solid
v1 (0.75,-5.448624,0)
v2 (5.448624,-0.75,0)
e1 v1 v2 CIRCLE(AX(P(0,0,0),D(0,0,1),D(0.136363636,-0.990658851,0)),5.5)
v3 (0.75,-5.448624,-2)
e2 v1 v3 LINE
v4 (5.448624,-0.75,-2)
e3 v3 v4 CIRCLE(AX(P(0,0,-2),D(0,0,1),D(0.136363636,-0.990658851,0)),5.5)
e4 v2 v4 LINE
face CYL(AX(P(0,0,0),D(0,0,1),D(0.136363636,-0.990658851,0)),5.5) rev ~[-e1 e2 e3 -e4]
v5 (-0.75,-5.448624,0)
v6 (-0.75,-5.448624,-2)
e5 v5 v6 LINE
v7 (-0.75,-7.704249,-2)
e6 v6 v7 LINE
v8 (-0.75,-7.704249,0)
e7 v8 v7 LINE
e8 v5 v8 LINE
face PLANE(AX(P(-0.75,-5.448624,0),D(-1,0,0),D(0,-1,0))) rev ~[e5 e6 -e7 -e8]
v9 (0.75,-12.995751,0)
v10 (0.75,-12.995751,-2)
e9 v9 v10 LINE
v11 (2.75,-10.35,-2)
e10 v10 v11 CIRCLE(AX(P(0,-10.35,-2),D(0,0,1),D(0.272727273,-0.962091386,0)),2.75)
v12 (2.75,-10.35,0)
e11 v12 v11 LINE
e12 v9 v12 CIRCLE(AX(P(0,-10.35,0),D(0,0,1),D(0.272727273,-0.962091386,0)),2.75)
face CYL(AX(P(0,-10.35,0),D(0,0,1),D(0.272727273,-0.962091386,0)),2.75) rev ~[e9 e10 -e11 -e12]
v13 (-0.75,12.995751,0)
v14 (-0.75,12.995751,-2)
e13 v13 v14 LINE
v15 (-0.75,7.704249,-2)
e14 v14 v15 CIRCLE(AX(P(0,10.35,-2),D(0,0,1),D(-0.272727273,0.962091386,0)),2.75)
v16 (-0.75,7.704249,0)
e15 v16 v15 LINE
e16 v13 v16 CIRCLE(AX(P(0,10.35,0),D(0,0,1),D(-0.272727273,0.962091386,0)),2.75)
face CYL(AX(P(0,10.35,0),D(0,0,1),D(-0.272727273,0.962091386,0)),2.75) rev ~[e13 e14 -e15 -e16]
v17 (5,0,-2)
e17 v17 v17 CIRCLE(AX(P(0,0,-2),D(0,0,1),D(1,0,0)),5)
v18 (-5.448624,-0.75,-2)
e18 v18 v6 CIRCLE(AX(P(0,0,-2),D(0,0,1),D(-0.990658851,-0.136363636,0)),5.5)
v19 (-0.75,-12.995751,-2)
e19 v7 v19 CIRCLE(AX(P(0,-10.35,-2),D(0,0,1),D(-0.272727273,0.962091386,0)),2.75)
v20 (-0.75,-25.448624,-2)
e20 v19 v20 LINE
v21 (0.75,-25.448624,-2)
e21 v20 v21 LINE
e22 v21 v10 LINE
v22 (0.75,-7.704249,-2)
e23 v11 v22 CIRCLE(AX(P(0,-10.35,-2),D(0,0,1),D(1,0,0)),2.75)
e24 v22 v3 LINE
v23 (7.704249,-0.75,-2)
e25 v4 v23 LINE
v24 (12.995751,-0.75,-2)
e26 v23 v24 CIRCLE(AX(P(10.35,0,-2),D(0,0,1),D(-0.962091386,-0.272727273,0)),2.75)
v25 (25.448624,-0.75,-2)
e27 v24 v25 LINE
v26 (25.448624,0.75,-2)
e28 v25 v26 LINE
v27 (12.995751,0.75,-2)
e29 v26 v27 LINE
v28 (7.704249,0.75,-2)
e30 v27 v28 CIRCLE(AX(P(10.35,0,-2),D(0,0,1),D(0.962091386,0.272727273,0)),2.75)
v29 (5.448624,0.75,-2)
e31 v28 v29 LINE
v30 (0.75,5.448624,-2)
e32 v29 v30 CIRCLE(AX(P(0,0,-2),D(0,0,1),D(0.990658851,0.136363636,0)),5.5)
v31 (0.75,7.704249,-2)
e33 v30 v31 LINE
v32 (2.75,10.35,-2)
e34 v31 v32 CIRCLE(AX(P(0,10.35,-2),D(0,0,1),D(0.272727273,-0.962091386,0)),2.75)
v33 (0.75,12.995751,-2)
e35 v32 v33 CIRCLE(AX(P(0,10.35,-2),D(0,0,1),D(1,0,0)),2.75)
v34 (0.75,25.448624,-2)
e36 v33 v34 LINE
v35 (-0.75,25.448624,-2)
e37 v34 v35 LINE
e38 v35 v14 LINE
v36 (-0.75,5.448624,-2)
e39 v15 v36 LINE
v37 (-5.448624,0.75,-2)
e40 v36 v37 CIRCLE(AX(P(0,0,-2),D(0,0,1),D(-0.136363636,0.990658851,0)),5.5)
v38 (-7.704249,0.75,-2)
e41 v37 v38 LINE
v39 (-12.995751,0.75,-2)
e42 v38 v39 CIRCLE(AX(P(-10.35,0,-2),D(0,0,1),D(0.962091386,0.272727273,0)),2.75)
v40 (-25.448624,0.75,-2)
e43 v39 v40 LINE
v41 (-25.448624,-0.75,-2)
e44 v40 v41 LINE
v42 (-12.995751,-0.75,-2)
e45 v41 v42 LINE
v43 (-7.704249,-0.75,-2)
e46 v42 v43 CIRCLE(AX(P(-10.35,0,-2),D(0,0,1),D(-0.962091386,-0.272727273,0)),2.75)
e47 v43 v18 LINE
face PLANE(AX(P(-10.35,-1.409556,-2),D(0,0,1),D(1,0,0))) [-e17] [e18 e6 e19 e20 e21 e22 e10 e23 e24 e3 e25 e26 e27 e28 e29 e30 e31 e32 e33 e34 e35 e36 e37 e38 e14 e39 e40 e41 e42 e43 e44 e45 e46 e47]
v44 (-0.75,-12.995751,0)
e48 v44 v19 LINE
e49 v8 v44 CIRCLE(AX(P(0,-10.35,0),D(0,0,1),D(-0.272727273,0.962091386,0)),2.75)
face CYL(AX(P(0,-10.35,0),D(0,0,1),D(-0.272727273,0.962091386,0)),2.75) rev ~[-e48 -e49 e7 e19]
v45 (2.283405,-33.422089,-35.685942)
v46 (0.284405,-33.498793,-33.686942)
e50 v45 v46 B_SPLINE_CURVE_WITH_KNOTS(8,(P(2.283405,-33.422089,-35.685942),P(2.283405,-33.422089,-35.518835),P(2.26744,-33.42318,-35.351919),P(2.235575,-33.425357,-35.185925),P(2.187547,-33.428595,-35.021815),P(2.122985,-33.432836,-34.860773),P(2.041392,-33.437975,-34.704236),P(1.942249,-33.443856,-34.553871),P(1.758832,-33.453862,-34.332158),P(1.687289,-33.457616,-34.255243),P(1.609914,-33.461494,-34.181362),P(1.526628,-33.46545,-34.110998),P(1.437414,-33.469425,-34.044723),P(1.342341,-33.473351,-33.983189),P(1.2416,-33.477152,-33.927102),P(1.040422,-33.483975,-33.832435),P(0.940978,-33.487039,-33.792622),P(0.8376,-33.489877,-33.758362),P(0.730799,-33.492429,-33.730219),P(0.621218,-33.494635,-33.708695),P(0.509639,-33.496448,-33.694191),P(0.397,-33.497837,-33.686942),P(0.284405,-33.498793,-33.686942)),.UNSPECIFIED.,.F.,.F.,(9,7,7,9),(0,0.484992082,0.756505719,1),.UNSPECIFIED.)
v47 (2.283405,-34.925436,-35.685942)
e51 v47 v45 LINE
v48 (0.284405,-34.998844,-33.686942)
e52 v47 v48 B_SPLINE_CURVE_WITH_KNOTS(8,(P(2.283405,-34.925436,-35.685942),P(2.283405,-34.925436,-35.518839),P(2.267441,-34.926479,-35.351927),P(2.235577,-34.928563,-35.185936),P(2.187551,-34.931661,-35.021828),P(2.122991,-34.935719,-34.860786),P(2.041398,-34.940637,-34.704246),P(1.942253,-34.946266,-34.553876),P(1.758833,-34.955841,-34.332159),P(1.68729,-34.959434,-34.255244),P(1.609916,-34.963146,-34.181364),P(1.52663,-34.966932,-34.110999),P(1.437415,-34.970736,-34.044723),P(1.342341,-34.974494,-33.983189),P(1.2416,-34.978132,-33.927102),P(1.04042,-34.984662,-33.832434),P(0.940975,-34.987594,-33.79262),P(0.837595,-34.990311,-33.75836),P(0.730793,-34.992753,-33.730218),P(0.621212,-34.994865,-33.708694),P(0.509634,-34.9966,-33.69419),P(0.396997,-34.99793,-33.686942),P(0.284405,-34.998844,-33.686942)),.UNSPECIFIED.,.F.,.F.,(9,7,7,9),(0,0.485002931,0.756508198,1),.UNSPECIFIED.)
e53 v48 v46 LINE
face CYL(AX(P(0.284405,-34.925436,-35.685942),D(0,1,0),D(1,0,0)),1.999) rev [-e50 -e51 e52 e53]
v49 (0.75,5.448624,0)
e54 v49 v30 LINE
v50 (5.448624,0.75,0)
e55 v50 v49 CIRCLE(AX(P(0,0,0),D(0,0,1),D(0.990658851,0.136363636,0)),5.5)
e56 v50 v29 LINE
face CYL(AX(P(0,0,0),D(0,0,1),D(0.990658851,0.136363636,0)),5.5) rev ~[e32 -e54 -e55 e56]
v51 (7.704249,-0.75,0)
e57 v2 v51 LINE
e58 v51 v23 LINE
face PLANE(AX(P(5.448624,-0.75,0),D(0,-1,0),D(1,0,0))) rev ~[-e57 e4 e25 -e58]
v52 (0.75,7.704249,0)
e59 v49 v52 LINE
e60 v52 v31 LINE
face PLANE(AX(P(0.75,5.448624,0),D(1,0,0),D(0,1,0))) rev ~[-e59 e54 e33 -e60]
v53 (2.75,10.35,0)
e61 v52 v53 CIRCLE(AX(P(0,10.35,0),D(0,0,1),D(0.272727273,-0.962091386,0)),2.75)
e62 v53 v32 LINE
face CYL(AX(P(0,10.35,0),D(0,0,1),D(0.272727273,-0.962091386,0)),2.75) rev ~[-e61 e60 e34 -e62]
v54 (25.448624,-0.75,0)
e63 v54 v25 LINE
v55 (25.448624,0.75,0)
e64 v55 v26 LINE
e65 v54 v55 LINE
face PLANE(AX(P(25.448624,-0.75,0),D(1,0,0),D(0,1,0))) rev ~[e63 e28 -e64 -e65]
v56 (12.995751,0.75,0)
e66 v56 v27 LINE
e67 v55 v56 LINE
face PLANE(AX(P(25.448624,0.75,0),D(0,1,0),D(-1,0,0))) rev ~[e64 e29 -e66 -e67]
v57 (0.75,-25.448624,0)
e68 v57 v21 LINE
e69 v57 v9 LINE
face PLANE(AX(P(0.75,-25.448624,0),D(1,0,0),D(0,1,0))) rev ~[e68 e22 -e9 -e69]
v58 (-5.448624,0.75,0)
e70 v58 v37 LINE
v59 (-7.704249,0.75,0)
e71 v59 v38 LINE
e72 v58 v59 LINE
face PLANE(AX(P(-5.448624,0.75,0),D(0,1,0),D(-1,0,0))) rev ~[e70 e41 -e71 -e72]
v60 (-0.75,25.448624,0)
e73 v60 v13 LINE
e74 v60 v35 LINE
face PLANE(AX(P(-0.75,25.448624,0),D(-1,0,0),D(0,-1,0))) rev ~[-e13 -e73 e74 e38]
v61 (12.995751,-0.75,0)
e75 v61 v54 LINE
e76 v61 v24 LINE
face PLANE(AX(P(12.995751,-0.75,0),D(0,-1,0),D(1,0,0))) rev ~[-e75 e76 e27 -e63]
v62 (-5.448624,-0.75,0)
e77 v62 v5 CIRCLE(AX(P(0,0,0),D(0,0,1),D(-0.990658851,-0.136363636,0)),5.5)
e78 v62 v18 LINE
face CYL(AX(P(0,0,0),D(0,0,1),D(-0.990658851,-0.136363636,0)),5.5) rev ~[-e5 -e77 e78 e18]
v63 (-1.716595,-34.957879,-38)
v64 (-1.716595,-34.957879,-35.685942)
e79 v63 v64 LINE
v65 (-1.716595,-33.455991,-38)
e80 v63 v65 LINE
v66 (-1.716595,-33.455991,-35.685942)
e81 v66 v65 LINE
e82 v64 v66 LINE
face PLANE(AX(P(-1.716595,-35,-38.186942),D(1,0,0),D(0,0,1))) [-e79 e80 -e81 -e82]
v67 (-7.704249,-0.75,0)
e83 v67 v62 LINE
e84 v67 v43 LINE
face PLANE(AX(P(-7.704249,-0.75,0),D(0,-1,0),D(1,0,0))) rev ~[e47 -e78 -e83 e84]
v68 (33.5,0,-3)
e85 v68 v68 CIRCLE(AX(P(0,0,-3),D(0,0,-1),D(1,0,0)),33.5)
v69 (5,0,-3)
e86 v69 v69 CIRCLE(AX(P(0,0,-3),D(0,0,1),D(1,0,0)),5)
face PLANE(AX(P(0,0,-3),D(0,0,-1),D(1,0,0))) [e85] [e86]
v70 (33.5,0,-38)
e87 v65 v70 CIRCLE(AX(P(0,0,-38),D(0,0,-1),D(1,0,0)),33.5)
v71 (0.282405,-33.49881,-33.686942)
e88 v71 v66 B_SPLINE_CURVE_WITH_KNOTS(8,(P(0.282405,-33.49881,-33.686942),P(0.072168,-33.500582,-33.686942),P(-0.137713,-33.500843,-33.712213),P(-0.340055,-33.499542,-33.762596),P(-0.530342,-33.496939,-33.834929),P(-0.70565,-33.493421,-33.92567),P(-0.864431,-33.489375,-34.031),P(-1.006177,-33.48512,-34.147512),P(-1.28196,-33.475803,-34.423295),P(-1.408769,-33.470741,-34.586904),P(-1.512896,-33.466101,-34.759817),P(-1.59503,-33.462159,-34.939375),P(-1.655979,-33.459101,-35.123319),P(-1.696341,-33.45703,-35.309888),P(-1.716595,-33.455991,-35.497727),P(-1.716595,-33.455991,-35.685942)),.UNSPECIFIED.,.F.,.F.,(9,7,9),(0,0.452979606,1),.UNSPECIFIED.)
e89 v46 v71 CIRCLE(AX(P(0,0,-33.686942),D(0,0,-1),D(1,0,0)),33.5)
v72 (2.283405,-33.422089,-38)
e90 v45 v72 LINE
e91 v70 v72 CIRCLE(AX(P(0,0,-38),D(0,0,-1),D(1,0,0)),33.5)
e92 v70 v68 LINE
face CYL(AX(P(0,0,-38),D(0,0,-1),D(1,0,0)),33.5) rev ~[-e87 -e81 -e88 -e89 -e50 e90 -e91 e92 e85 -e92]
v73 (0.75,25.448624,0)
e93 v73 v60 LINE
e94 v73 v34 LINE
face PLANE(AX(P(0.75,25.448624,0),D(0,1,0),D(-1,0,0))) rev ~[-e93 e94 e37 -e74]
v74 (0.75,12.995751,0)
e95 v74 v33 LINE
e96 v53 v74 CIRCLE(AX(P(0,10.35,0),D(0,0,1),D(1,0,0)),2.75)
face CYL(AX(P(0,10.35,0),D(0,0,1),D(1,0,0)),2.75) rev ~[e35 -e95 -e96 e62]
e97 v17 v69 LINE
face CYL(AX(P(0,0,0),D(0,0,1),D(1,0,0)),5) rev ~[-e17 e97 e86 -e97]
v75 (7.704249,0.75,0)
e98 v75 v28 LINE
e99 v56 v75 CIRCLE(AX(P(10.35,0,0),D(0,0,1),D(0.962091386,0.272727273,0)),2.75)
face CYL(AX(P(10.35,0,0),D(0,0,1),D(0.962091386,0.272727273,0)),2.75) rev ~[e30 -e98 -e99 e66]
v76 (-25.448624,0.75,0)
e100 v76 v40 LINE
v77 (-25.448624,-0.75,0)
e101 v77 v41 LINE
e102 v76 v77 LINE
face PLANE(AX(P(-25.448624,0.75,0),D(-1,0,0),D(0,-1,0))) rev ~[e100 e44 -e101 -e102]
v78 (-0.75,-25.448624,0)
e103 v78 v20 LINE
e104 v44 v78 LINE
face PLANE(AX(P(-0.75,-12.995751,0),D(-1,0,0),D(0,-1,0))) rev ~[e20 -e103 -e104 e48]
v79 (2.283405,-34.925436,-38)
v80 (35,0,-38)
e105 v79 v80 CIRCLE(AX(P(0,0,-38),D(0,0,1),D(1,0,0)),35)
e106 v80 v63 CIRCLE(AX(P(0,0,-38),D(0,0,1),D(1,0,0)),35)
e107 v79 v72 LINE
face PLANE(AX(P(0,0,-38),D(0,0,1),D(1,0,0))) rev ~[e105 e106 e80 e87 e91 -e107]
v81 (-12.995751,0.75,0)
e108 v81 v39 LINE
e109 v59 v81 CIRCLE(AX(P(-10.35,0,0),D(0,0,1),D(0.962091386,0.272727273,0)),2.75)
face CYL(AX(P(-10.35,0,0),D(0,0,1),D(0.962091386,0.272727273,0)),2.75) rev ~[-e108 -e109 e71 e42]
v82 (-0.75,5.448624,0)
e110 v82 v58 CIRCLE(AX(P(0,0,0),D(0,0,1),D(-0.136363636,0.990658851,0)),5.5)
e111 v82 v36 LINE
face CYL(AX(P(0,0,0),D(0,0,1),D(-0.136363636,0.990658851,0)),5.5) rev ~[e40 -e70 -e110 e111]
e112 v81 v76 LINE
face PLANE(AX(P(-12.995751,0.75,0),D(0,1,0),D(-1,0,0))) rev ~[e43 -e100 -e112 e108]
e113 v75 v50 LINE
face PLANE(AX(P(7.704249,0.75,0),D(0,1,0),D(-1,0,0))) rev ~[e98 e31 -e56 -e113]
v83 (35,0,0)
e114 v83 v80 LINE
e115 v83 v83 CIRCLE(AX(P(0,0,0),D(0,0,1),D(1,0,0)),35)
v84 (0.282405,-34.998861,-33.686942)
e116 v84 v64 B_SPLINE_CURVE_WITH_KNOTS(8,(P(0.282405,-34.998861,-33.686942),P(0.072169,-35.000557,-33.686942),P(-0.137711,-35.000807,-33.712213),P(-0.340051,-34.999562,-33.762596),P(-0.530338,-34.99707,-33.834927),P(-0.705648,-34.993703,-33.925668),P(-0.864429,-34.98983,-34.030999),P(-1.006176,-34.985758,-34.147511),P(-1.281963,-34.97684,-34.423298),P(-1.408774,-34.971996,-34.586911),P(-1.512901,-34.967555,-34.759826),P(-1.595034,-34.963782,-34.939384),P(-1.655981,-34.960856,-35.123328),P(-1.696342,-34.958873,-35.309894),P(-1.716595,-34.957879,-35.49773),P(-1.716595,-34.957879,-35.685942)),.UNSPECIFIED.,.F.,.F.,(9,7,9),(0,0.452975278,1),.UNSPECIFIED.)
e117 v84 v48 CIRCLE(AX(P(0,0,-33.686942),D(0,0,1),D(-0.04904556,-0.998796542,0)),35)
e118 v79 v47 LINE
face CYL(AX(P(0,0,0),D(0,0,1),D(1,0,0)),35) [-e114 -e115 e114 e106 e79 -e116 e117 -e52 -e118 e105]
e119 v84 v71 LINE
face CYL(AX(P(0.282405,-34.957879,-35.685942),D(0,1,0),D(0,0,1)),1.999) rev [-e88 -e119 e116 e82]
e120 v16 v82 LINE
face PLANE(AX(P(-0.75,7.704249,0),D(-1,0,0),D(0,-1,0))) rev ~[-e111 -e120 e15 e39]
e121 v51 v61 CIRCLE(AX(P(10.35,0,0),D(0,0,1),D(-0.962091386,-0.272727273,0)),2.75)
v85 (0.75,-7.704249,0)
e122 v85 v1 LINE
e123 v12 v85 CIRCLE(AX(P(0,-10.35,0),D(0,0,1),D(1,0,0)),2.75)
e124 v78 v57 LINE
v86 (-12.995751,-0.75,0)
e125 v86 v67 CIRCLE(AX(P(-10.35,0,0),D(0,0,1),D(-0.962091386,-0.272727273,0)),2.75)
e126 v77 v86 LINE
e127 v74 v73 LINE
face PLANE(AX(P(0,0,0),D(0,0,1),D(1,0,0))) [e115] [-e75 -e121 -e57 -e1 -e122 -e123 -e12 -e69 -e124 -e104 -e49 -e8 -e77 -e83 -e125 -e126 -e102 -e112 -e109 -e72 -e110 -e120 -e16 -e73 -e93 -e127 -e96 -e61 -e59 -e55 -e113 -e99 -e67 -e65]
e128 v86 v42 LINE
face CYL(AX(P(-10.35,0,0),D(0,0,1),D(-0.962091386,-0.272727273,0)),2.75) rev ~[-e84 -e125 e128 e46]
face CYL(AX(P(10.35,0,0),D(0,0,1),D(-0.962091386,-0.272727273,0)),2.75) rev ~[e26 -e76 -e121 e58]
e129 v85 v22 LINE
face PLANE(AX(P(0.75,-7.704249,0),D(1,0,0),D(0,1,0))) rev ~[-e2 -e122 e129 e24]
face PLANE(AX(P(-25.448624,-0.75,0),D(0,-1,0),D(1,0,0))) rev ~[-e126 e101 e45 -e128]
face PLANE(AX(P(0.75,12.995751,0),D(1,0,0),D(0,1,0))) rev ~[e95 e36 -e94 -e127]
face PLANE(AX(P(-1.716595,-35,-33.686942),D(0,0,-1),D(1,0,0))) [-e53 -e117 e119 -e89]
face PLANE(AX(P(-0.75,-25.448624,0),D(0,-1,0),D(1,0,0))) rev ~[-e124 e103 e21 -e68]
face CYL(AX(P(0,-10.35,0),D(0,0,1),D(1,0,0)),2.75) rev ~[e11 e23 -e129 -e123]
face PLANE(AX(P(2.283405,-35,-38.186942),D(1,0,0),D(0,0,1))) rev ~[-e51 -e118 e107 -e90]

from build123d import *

# Parameters (mm, degrees)
F0_R     = 35
F0_R_2   = 5
F1_DEPTH = 38
F2_DEPTH = 2
F3_R     = 33.5
F4_DEPTH = 35
F5_DEPTH = 38.001
F7_W     = 4
F7_H     = 4.5
F8_DEPTH = 2
F9_R     = 1.999


# Not quite as in the source:
# - a fillet or chamfer is up to 0.001 mm smaller than in the source, because OpenCascade refuses the exact size


with BuildPart() as f1:
    # F0 (on Top) → F1 (new body)
    with BuildSketch(Plane.XY):
        Circle(F0_R)
        with BuildLine():
            ThreePointArc((0.75, 5.4486236794), (3.8890872965, 3.8890872965), (5.4486236794, 0.75))
            Line((5.4486236794, 0.75), (7.7042486889, 0.75))
            ThreePointArc((7.7042486889, 0.75), (10.35, 2.75), (12.9957513111, 0.75))
            Line((12.9957513111, 0.75), (25.4486236794, 0.75))
            Line((25.4486236794, 0.75), (25.4486236794, -0.75))
            Line((25.4486236794, -0.75), (12.9957513111, -0.75))
            ThreePointArc((12.9957513111, -0.75), (10.35, -2.75), (7.7042486889, -0.75))
            Line((7.7042486889, -0.75), (5.4486236794, -0.75))
            ThreePointArc((5.4486236794, -0.75), (3.8890872965, -3.8890872965), (0.75, -5.4486236794))
            Line((0.75, -5.4486236794), (0.75, -7.7042486889))
            ThreePointArc((0.75, -7.7042486889), (2.1937410968, -8.6916876048), (2.75, -10.35))
            ThreePointArc((2.75, -10.35), (2.1937410968, -12.0083123952), (0.75, -12.9957513111))
            Line((0.75, -12.9957513111), (0.75, -25.4486236794))
            Line((0.75, -25.4486236794), (-0.75, -25.4486236794))
            Line((-0.75, -25.4486236794), (-0.75, -12.9957513111))
            ThreePointArc((-0.75, -12.9957513111), (-2.75, -10.35), (-0.75, -7.7042486889))
            Line((-0.75, -7.7042486889), (-0.75, -5.4486236794))
            ThreePointArc((-0.75, -5.4486236794), (-3.8890872965, -3.8890872965), (-5.4486236794, -0.75))
            Line((-5.4486236794, -0.75), (-7.7042486889, -0.75))
            ThreePointArc((-7.7042486889, -0.75), (-10.35, -2.75), (-12.9957513111, -0.75))
            Line((-12.9957513111, -0.75), (-25.4486236794, -0.75))
            Line((-25.4486236794, -0.75), (-25.4486236794, 0.75))
            Line((-25.4486236794, 0.75), (-12.9957513111, 0.75))
            ThreePointArc((-12.9957513111, 0.75), (-10.35, 2.75), (-7.7042486889, 0.75))
            Line((-7.7042486889, 0.75), (-5.4486236794, 0.75))
            ThreePointArc((-5.4486236794, 0.75), (-3.8890872965, 3.8890872965), (-0.75, 5.4486236794))
            Line((-0.75, 5.4486236794), (-0.75, 7.7042486889))
            ThreePointArc((-0.75, 7.7042486889), (-2.75, 10.35), (-0.75, 12.9957513111))
            Line((-0.75, 12.9957513111), (-0.75, 25.4486236794))
            Line((-0.75, 25.4486236794), (0.75, 25.4486236794))
            Line((0.75, 25.4486236794), (0.75, 12.9957513111))
            ThreePointArc((0.75, 12.9957513111), (2.1937410968, 12.0083123952), (2.75, 10.35))
            ThreePointArc((2.75, 10.35), (2.1937410968, 8.6916876048), (0.75, 7.7042486889))
            Line((0.75, 7.7042486889), (0.75, 5.4486236794))
        make_face(mode=Mode.SUBTRACT)
        with BuildLine():
            Line((0.75, -12.9957513111), (0.75, -7.7042486889))
            ThreePointArc((0.75, -7.7042486889), (0, -7.6), (-0.75, -7.7042486889))
            Line((-0.75, -7.7042486889), (-0.75, -12.9957513111))
            ThreePointArc((-0.75, -12.9957513111), (0, -13.1), (0.75, -12.9957513111))
        make_face()
        with BuildLine():
            Line((12.9957513111, 0.75), (7.7042486889, 0.75))
            ThreePointArc((7.7042486889, 0.75), (7.6, 0), (7.7042486889, -0.75))
            Line((7.7042486889, -0.75), (12.9957513111, -0.75))
            ThreePointArc((12.9957513111, -0.75), (13.0738131457, -0.3786052658), (13.1, 0))
            ThreePointArc((13.1, 0), (13.0738131457, 0.3786052658), (12.9957513111, 0.75))
        make_face()
        with BuildLine():
            ThreePointArc((-5.4486236794, -0.75), (-5.5, 0), (-5.4486236794, 0.75))
            Line((-5.4486236794, 0.75), (-7.7042486889, 0.75))
            ThreePointArc((-7.7042486889, 0.75), (-7.6261868543, 0.3786052658), (-7.6, 0))
            ThreePointArc((-7.6, 0), (-7.6261868543, -0.3786052658), (-7.7042486889, -0.75))
            Line((-7.7042486889, -0.75), (-5.4486236794, -0.75))
        make_face()
        with BuildLine():
            Line((-12.9957513111, 0.75), (-7.7042486889, 0.75))
            ThreePointArc((-7.7042486889, 0.75), (-10.35, 2.75), (-12.9957513111, 0.75))
        make_face()
        with BuildLine():
            ThreePointArc((-0.75, 12.9957513111), (0, 13.1), (0.75, 12.9957513111))
            Line((0.75, 12.9957513111), (0.75, 25.4486236794))
            Line((0.75, 25.4486236794), (-0.75, 25.4486236794))
            Line((-0.75, 25.4486236794), (-0.75, 12.9957513111))
        make_face()
        with BuildLine():
            ThreePointArc((-12.9957513111, -0.75), (-10.35, -2.75), (-7.7042486889, -0.75))
            Line((-7.7042486889, -0.75), (-12.9957513111, -0.75))
        make_face()
        with BuildLine():
            ThreePointArc((-12.9957513111, -0.75), (-13.1, 0), (-12.9957513111, 0.75))
            Line((-12.9957513111, 0.75), (-25.4486236794, 0.75))
            Line((-25.4486236794, 0.75), (-25.4486236794, -0.75))
            Line((-25.4486236794, -0.75), (-12.9957513111, -0.75))
        make_face()
        with BuildLine():
            Line((-0.75, -12.9957513111), (-0.75, -7.7042486889))
            ThreePointArc((-0.75, -7.7042486889), (-2.75, -10.35), (-0.75, -12.9957513111))
        make_face()
        with BuildLine():
            Line((0.75, -25.4486236794), (0.75, -12.9957513111))
            ThreePointArc((0.75, -12.9957513111), (0, -13.1), (-0.75, -12.9957513111))
            Line((-0.75, -12.9957513111), (-0.75, -25.4486236794))
            Line((-0.75, -25.4486236794), (0.75, -25.4486236794))
        make_face()
        with BuildLine():
            ThreePointArc((2.75, -10.35), (2.1937410968, -8.6916876048), (0.75, -7.7042486889))
            Line((0.75, -7.7042486889), (0.75, -12.9957513111))
            ThreePointArc((0.75, -12.9957513111), (2.1937410968, -12.0083123952), (2.75, -10.35))
        make_face()
        with BuildLine():
            Line((12.9957513111, -0.75), (7.7042486889, -0.75))
            ThreePointArc((7.7042486889, -0.75), (10.35, -2.75), (12.9957513111, -0.75))
        make_face()
        with BuildLine():
            Line((25.4486236794, 0.75), (12.9957513111, 0.75))
            ThreePointArc((12.9957513111, 0.75), (13.0738131457, 0.3786052658), (13.1, 0))
            ThreePointArc((13.1, 0), (13.0738131457, -0.3786052658), (12.9957513111, -0.75))
            Line((12.9957513111, -0.75), (25.4486236794, -0.75))
            Line((25.4486236794, -0.75), (25.4486236794, 0.75))
        make_face()
        with BuildLine():
            ThreePointArc((5.4486236794, -0.75), (5.4871408874, -0.3758788124), (5.5, 0))
            ThreePointArc((5.5, 0), (5.4871408874, 0.3758788124), (5.4486236794, 0.75))
            ThreePointArc((5.4486236794, 0.75), (3.8890872965, 3.8890872965), (0.75, 5.4486236794))
            ThreePointArc((0.75, 5.4486236794), (0, 5.5), (-0.75, 5.4486236794))
            ThreePointArc((-0.75, 5.4486236794), (-3.8890872965, 3.8890872965), (-5.4486236794, 0.75))
            ThreePointArc((-5.4486236794, 0.75), (-5.5, 0), (-5.4486236794, -0.75))
            ThreePointArc((-5.4486236794, -0.75), (-3.8890872965, -3.8890872965), (-0.75, -5.4486236794))
            ThreePointArc((-0.75, -5.4486236794), (0, -5.5), (0.75, -5.4486236794))
            ThreePointArc((0.75, -5.4486236794), (3.8890872965, -3.8890872965), (5.4486236794, -0.75))
        make_face()
        Circle(F0_R_2, mode=Mode.SUBTRACT)
        with BuildLine():
            ThreePointArc((12.9957513111, 0.75), (10.35, 2.75), (7.7042486889, 0.75))
            Line((7.7042486889, 0.75), (12.9957513111, 0.75))
        make_face()
        with BuildLine():
            ThreePointArc((-0.75, 7.7042486889), (0, 7.6), (0.75, 7.7042486889))
            Line((0.75, 7.7042486889), (0.75, 12.9957513111))
            ThreePointArc((0.75, 12.9957513111), (0, 13.1), (-0.75, 12.9957513111))
            Line((-0.75, 12.9957513111), (-0.75, 7.7042486889))
        make_face()
        with BuildLine():
            ThreePointArc((5.4486236794, 0.75), (5.4871408874, 0.3758788124), (5.5, 0))
            ThreePointArc((5.5, 0), (5.4871408874, -0.3758788124), (5.4486236794, -0.75))
            Line((5.4486236794, -0.75), (7.7042486889, -0.75))
            ThreePointArc((7.7042486889, -0.75), (7.6, 0), (7.7042486889, 0.75))
            Line((7.7042486889, 0.75), (5.4486236794, 0.75))
        make_face()
        with BuildLine():
            Line((0.75, -7.7042486889), (0.75, -5.4486236794))
            ThreePointArc((0.75, -5.4486236794), (0, -5.5), (-0.75, -5.4486236794))
            Line((-0.75, -5.4486236794), (-0.75, -7.7042486889))
            ThreePointArc((-0.75, -7.7042486889), (0, -7.6), (0.75, -7.7042486889))
        make_face()
        with BuildLine():
            ThreePointArc((-0.75, 5.4486236794), (0, 5.5), (0.75, 5.4486236794))
            Line((0.75, 5.4486236794), (0.75, 7.7042486889))
            ThreePointArc((0.75, 7.7042486889), (0, 7.6), (-0.75, 7.7042486889))
            Line((-0.75, 7.7042486889), (-0.75, 5.4486236794))
        make_face()
        Circle(F0_R_2)
        with BuildLine():
            ThreePointArc((-0.75, 12.9957513111), (-2.75, 10.35), (-0.75, 7.7042486889))
            Line((-0.75, 7.7042486889), (-0.75, 12.9957513111))
        make_face()
        with BuildLine():
            Line((0.75, 12.9957513111), (0.75, 7.7042486889))
            ThreePointArc((0.75, 7.7042486889), (2.1937410968, 8.6916876048), (2.75, 10.35))
            ThreePointArc((2.75, 10.35), (2.1937410968, 12.0083123952), (0.75, 12.9957513111))
        make_face()
        with BuildLine():
            ThreePointArc((-7.6, 0), (-7.6261868543, 0.3786052658), (-7.7042486889, 0.75))
            Line((-7.7042486889, 0.75), (-12.9957513111, 0.75))
            ThreePointArc((-12.9957513111, 0.75), (-13.1, 0), (-12.9957513111, -0.75))
            Line((-12.9957513111, -0.75), (-7.7042486889, -0.75))
            ThreePointArc((-7.7042486889, -0.75), (-7.6261868543, -0.3786052658), (-7.6, 0))
        make_face()
    extrude(amount=-F1_DEPTH)

    # F0 (on Top) → F2 (cut)
    with BuildSketch(Plane.XY):
        with BuildLine():
            ThreePointArc((-12.9957513111, -0.75), (-10.35, -2.75), (-7.7042486889, -0.75))
            Line((-7.7042486889, -0.75), (-12.9957513111, -0.75))
        make_face()
        with BuildLine():
            Line((-12.9957513111, 0.75), (-7.7042486889, 0.75))
            ThreePointArc((-7.7042486889, 0.75), (-10.35, 2.75), (-12.9957513111, 0.75))
        make_face()
        with BuildLine():
            ThreePointArc((-7.6, 0), (-7.6261868543, 0.3786052658), (-7.7042486889, 0.75))
            Line((-7.7042486889, 0.75), (-12.9957513111, 0.75))
            ThreePointArc((-12.9957513111, 0.75), (-13.1, 0), (-12.9957513111, -0.75))
            Line((-12.9957513111, -0.75), (-7.7042486889, -0.75))
            ThreePointArc((-7.7042486889, -0.75), (-7.6261868543, -0.3786052658), (-7.6, 0))
        make_face()
        with BuildLine():
            ThreePointArc((-12.9957513111, -0.75), (-13.1, 0), (-12.9957513111, 0.75))
            Line((-12.9957513111, 0.75), (-25.4486236794, 0.75))
            Line((-25.4486236794, 0.75), (-25.4486236794, -0.75))
            Line((-25.4486236794, -0.75), (-12.9957513111, -0.75))
        make_face()
        with BuildLine():
            ThreePointArc((-5.4486236794, -0.75), (-5.5, 0), (-5.4486236794, 0.75))
            Line((-5.4486236794, 0.75), (-7.7042486889, 0.75))
            ThreePointArc((-7.7042486889, 0.75), (-7.6261868543, 0.3786052658), (-7.6, 0))
            ThreePointArc((-7.6, 0), (-7.6261868543, -0.3786052658), (-7.7042486889, -0.75))
            Line((-7.7042486889, -0.75), (-5.4486236794, -0.75))
        make_face()
        with BuildLine():
            ThreePointArc((5.4486236794, -0.75), (5.4871408874, -0.3758788124), (5.5, 0))
            ThreePointArc((5.5, 0), (5.4871408874, 0.3758788124), (5.4486236794, 0.75))
            ThreePointArc((5.4486236794, 0.75), (3.8890872965, 3.8890872965), (0.75, 5.4486236794))
            ThreePointArc((0.75, 5.4486236794), (0, 5.5), (-0.75, 5.4486236794))
            ThreePointArc((-0.75, 5.4486236794), (-3.8890872965, 3.8890872965), (-5.4486236794, 0.75))
            ThreePointArc((-5.4486236794, 0.75), (-5.5, 0), (-5.4486236794, -0.75))
            ThreePointArc((-5.4486236794, -0.75), (-3.8890872965, -3.8890872965), (-0.75, -5.4486236794))
            ThreePointArc((-0.75, -5.4486236794), (0, -5.5), (0.75, -5.4486236794))
            ThreePointArc((0.75, -5.4486236794), (3.8890872965, -3.8890872965), (5.4486236794, -0.75))
        make_face()
        Circle(F0_R_2, mode=Mode.SUBTRACT)
        with BuildLine():
            Line((0.75, 12.9957513111), (0.75, 7.7042486889))
            ThreePointArc((0.75, 7.7042486889), (2.1937410968, 8.6916876048), (2.75, 10.35))
            ThreePointArc((2.75, 10.35), (2.1937410968, 12.0083123952), (0.75, 12.9957513111))
        make_face()
        with BuildLine():
            ThreePointArc((-0.75, 12.9957513111), (-2.75, 10.35), (-0.75, 7.7042486889))
            Line((-0.75, 7.7042486889), (-0.75, 12.9957513111))
        make_face()
        with BuildLine():
            ThreePointArc((-0.75, 7.7042486889), (0, 7.6), (0.75, 7.7042486889))
            Line((0.75, 7.7042486889), (0.75, 12.9957513111))
            ThreePointArc((0.75, 12.9957513111), (0, 13.1), (-0.75, 12.9957513111))
            Line((-0.75, 12.9957513111), (-0.75, 7.7042486889))
        make_face()
        with BuildLine():
            ThreePointArc((-0.75, 5.4486236794), (0, 5.5), (0.75, 5.4486236794))
            Line((0.75, 5.4486236794), (0.75, 7.7042486889))
            ThreePointArc((0.75, 7.7042486889), (0, 7.6), (-0.75, 7.7042486889))
            Line((-0.75, 7.7042486889), (-0.75, 5.4486236794))
        make_face()
        with BuildLine():
            ThreePointArc((-0.75, 12.9957513111), (0, 13.1), (0.75, 12.9957513111))
            Line((0.75, 12.9957513111), (0.75, 25.4486236794))
            Line((0.75, 25.4486236794), (-0.75, 25.4486236794))
            Line((-0.75, 25.4486236794), (-0.75, 12.9957513111))
        make_face()
        with BuildLine():
            Line((12.9957513111, 0.75), (7.7042486889, 0.75))
            ThreePointArc((7.7042486889, 0.75), (7.6, 0), (7.7042486889, -0.75))
            Line((7.7042486889, -0.75), (12.9957513111, -0.75))
            ThreePointArc((12.9957513111, -0.75), (13.0738131457, -0.3786052658), (13.1, 0))
            ThreePointArc((13.1, 0), (13.0738131457, 0.3786052658), (12.9957513111, 0.75))
        make_face()
        with BuildLine():
            ThreePointArc((12.9957513111, 0.75), (10.35, 2.75), (7.7042486889, 0.75))
            Line((7.7042486889, 0.75), (12.9957513111, 0.75))
        make_face()
        with BuildLine():
            Line((12.9957513111, -0.75), (7.7042486889, -0.75))
            ThreePointArc((7.7042486889, -0.75), (10.35, -2.75), (12.9957513111, -0.75))
        make_face()
        with BuildLine():
            ThreePointArc((5.4486236794, 0.75), (5.4871408874, 0.3758788124), (5.5, 0))
            ThreePointArc((5.5, 0), (5.4871408874, -0.3758788124), (5.4486236794, -0.75))
            Line((5.4486236794, -0.75), (7.7042486889, -0.75))
            ThreePointArc((7.7042486889, -0.75), (7.6, 0), (7.7042486889, 0.75))
            Line((7.7042486889, 0.75), (5.4486236794, 0.75))
        make_face()
        with BuildLine():
            Line((25.4486236794, 0.75), (12.9957513111, 0.75))
            ThreePointArc((12.9957513111, 0.75), (13.0738131457, 0.3786052658), (13.1, 0))
            ThreePointArc((13.1, 0), (13.0738131457, -0.3786052658), (12.9957513111, -0.75))
            Line((12.9957513111, -0.75), (25.4486236794, -0.75))
            Line((25.4486236794, -0.75), (25.4486236794, 0.75))
        make_face()
        with BuildLine():
            Line((0.75, -25.4486236794), (0.75, -12.9957513111))
            ThreePointArc((0.75, -12.9957513111), (0, -13.1), (-0.75, -12.9957513111))
            Line((-0.75, -12.9957513111), (-0.75, -25.4486236794))
            Line((-0.75, -25.4486236794), (0.75, -25.4486236794))
        make_face()
        with BuildLine():
            Line((0.75, -12.9957513111), (0.75, -7.7042486889))
            ThreePointArc((0.75, -7.7042486889), (0, -7.6), (-0.75, -7.7042486889))
            Line((-0.75, -7.7042486889), (-0.75, -12.9957513111))
            ThreePointArc((-0.75, -12.9957513111), (0, -13.1), (0.75, -12.9957513111))
        make_face()
        with BuildLine():
            Line((-0.75, -12.9957513111), (-0.75, -7.7042486889))
            ThreePointArc((-0.75, -7.7042486889), (-2.75, -10.35), (-0.75, -12.9957513111))
        make_face()
        with BuildLine():
            ThreePointArc((2.75, -10.35), (2.1937410968, -8.6916876048), (0.75, -7.7042486889))
            Line((0.75, -7.7042486889), (0.75, -12.9957513111))
            ThreePointArc((0.75, -12.9957513111), (2.1937410968, -12.0083123952), (2.75, -10.35))
        make_face()
        with BuildLine():
            Line((0.75, -7.7042486889), (0.75, -5.4486236794))
            ThreePointArc((0.75, -5.4486236794), (0, -5.5), (-0.75, -5.4486236794))
            Line((-0.75, -5.4486236794), (-0.75, -7.7042486889))
            ThreePointArc((-0.75, -7.7042486889), (0, -7.6), (0.75, -7.7042486889))
        make_face()
    extrude(amount=-F2_DEPTH, mode=Mode.SUBTRACT)

    # F3 (on face) → F4 (cut)
    with BuildSketch(Plane(origin=(0, 0, -38), x_dir=(1, 0, 0), z_dir=(0, 0, -1))):
        Circle(F3_R)
    extrude(amount=-F4_DEPTH, mode=Mode.SUBTRACT)

    # F0 (on Top) → F5 (cut, through all)
    with BuildSketch(Plane.XY):
        Circle(F0_R_2)
    extrude(amount=-F5_DEPTH, mode=Mode.SUBTRACT)

    # F7 (on offset) → F8 (cut)
    with BuildSketch(Plane.XZ.offset(35)):
        with Locations((0.2834053928, -35.936942324)):
            Rectangle(F7_W, F7_H)
    extrude(amount=-F8_DEPTH, mode=Mode.SUBTRACT)

    # F9 (radius 2 in the source; OpenCascade refuses exactly that, so slightly less here)
    f9_edges = [f1.edges().sort_by_distance(p)[0] for p in [
        (2.283405, -34.173763, -33.686942),
        (-1.716595, -34.206935, -33.686942),
    ]]
    fillet(f9_edges, radius=F9_R)


solid = f1.part
